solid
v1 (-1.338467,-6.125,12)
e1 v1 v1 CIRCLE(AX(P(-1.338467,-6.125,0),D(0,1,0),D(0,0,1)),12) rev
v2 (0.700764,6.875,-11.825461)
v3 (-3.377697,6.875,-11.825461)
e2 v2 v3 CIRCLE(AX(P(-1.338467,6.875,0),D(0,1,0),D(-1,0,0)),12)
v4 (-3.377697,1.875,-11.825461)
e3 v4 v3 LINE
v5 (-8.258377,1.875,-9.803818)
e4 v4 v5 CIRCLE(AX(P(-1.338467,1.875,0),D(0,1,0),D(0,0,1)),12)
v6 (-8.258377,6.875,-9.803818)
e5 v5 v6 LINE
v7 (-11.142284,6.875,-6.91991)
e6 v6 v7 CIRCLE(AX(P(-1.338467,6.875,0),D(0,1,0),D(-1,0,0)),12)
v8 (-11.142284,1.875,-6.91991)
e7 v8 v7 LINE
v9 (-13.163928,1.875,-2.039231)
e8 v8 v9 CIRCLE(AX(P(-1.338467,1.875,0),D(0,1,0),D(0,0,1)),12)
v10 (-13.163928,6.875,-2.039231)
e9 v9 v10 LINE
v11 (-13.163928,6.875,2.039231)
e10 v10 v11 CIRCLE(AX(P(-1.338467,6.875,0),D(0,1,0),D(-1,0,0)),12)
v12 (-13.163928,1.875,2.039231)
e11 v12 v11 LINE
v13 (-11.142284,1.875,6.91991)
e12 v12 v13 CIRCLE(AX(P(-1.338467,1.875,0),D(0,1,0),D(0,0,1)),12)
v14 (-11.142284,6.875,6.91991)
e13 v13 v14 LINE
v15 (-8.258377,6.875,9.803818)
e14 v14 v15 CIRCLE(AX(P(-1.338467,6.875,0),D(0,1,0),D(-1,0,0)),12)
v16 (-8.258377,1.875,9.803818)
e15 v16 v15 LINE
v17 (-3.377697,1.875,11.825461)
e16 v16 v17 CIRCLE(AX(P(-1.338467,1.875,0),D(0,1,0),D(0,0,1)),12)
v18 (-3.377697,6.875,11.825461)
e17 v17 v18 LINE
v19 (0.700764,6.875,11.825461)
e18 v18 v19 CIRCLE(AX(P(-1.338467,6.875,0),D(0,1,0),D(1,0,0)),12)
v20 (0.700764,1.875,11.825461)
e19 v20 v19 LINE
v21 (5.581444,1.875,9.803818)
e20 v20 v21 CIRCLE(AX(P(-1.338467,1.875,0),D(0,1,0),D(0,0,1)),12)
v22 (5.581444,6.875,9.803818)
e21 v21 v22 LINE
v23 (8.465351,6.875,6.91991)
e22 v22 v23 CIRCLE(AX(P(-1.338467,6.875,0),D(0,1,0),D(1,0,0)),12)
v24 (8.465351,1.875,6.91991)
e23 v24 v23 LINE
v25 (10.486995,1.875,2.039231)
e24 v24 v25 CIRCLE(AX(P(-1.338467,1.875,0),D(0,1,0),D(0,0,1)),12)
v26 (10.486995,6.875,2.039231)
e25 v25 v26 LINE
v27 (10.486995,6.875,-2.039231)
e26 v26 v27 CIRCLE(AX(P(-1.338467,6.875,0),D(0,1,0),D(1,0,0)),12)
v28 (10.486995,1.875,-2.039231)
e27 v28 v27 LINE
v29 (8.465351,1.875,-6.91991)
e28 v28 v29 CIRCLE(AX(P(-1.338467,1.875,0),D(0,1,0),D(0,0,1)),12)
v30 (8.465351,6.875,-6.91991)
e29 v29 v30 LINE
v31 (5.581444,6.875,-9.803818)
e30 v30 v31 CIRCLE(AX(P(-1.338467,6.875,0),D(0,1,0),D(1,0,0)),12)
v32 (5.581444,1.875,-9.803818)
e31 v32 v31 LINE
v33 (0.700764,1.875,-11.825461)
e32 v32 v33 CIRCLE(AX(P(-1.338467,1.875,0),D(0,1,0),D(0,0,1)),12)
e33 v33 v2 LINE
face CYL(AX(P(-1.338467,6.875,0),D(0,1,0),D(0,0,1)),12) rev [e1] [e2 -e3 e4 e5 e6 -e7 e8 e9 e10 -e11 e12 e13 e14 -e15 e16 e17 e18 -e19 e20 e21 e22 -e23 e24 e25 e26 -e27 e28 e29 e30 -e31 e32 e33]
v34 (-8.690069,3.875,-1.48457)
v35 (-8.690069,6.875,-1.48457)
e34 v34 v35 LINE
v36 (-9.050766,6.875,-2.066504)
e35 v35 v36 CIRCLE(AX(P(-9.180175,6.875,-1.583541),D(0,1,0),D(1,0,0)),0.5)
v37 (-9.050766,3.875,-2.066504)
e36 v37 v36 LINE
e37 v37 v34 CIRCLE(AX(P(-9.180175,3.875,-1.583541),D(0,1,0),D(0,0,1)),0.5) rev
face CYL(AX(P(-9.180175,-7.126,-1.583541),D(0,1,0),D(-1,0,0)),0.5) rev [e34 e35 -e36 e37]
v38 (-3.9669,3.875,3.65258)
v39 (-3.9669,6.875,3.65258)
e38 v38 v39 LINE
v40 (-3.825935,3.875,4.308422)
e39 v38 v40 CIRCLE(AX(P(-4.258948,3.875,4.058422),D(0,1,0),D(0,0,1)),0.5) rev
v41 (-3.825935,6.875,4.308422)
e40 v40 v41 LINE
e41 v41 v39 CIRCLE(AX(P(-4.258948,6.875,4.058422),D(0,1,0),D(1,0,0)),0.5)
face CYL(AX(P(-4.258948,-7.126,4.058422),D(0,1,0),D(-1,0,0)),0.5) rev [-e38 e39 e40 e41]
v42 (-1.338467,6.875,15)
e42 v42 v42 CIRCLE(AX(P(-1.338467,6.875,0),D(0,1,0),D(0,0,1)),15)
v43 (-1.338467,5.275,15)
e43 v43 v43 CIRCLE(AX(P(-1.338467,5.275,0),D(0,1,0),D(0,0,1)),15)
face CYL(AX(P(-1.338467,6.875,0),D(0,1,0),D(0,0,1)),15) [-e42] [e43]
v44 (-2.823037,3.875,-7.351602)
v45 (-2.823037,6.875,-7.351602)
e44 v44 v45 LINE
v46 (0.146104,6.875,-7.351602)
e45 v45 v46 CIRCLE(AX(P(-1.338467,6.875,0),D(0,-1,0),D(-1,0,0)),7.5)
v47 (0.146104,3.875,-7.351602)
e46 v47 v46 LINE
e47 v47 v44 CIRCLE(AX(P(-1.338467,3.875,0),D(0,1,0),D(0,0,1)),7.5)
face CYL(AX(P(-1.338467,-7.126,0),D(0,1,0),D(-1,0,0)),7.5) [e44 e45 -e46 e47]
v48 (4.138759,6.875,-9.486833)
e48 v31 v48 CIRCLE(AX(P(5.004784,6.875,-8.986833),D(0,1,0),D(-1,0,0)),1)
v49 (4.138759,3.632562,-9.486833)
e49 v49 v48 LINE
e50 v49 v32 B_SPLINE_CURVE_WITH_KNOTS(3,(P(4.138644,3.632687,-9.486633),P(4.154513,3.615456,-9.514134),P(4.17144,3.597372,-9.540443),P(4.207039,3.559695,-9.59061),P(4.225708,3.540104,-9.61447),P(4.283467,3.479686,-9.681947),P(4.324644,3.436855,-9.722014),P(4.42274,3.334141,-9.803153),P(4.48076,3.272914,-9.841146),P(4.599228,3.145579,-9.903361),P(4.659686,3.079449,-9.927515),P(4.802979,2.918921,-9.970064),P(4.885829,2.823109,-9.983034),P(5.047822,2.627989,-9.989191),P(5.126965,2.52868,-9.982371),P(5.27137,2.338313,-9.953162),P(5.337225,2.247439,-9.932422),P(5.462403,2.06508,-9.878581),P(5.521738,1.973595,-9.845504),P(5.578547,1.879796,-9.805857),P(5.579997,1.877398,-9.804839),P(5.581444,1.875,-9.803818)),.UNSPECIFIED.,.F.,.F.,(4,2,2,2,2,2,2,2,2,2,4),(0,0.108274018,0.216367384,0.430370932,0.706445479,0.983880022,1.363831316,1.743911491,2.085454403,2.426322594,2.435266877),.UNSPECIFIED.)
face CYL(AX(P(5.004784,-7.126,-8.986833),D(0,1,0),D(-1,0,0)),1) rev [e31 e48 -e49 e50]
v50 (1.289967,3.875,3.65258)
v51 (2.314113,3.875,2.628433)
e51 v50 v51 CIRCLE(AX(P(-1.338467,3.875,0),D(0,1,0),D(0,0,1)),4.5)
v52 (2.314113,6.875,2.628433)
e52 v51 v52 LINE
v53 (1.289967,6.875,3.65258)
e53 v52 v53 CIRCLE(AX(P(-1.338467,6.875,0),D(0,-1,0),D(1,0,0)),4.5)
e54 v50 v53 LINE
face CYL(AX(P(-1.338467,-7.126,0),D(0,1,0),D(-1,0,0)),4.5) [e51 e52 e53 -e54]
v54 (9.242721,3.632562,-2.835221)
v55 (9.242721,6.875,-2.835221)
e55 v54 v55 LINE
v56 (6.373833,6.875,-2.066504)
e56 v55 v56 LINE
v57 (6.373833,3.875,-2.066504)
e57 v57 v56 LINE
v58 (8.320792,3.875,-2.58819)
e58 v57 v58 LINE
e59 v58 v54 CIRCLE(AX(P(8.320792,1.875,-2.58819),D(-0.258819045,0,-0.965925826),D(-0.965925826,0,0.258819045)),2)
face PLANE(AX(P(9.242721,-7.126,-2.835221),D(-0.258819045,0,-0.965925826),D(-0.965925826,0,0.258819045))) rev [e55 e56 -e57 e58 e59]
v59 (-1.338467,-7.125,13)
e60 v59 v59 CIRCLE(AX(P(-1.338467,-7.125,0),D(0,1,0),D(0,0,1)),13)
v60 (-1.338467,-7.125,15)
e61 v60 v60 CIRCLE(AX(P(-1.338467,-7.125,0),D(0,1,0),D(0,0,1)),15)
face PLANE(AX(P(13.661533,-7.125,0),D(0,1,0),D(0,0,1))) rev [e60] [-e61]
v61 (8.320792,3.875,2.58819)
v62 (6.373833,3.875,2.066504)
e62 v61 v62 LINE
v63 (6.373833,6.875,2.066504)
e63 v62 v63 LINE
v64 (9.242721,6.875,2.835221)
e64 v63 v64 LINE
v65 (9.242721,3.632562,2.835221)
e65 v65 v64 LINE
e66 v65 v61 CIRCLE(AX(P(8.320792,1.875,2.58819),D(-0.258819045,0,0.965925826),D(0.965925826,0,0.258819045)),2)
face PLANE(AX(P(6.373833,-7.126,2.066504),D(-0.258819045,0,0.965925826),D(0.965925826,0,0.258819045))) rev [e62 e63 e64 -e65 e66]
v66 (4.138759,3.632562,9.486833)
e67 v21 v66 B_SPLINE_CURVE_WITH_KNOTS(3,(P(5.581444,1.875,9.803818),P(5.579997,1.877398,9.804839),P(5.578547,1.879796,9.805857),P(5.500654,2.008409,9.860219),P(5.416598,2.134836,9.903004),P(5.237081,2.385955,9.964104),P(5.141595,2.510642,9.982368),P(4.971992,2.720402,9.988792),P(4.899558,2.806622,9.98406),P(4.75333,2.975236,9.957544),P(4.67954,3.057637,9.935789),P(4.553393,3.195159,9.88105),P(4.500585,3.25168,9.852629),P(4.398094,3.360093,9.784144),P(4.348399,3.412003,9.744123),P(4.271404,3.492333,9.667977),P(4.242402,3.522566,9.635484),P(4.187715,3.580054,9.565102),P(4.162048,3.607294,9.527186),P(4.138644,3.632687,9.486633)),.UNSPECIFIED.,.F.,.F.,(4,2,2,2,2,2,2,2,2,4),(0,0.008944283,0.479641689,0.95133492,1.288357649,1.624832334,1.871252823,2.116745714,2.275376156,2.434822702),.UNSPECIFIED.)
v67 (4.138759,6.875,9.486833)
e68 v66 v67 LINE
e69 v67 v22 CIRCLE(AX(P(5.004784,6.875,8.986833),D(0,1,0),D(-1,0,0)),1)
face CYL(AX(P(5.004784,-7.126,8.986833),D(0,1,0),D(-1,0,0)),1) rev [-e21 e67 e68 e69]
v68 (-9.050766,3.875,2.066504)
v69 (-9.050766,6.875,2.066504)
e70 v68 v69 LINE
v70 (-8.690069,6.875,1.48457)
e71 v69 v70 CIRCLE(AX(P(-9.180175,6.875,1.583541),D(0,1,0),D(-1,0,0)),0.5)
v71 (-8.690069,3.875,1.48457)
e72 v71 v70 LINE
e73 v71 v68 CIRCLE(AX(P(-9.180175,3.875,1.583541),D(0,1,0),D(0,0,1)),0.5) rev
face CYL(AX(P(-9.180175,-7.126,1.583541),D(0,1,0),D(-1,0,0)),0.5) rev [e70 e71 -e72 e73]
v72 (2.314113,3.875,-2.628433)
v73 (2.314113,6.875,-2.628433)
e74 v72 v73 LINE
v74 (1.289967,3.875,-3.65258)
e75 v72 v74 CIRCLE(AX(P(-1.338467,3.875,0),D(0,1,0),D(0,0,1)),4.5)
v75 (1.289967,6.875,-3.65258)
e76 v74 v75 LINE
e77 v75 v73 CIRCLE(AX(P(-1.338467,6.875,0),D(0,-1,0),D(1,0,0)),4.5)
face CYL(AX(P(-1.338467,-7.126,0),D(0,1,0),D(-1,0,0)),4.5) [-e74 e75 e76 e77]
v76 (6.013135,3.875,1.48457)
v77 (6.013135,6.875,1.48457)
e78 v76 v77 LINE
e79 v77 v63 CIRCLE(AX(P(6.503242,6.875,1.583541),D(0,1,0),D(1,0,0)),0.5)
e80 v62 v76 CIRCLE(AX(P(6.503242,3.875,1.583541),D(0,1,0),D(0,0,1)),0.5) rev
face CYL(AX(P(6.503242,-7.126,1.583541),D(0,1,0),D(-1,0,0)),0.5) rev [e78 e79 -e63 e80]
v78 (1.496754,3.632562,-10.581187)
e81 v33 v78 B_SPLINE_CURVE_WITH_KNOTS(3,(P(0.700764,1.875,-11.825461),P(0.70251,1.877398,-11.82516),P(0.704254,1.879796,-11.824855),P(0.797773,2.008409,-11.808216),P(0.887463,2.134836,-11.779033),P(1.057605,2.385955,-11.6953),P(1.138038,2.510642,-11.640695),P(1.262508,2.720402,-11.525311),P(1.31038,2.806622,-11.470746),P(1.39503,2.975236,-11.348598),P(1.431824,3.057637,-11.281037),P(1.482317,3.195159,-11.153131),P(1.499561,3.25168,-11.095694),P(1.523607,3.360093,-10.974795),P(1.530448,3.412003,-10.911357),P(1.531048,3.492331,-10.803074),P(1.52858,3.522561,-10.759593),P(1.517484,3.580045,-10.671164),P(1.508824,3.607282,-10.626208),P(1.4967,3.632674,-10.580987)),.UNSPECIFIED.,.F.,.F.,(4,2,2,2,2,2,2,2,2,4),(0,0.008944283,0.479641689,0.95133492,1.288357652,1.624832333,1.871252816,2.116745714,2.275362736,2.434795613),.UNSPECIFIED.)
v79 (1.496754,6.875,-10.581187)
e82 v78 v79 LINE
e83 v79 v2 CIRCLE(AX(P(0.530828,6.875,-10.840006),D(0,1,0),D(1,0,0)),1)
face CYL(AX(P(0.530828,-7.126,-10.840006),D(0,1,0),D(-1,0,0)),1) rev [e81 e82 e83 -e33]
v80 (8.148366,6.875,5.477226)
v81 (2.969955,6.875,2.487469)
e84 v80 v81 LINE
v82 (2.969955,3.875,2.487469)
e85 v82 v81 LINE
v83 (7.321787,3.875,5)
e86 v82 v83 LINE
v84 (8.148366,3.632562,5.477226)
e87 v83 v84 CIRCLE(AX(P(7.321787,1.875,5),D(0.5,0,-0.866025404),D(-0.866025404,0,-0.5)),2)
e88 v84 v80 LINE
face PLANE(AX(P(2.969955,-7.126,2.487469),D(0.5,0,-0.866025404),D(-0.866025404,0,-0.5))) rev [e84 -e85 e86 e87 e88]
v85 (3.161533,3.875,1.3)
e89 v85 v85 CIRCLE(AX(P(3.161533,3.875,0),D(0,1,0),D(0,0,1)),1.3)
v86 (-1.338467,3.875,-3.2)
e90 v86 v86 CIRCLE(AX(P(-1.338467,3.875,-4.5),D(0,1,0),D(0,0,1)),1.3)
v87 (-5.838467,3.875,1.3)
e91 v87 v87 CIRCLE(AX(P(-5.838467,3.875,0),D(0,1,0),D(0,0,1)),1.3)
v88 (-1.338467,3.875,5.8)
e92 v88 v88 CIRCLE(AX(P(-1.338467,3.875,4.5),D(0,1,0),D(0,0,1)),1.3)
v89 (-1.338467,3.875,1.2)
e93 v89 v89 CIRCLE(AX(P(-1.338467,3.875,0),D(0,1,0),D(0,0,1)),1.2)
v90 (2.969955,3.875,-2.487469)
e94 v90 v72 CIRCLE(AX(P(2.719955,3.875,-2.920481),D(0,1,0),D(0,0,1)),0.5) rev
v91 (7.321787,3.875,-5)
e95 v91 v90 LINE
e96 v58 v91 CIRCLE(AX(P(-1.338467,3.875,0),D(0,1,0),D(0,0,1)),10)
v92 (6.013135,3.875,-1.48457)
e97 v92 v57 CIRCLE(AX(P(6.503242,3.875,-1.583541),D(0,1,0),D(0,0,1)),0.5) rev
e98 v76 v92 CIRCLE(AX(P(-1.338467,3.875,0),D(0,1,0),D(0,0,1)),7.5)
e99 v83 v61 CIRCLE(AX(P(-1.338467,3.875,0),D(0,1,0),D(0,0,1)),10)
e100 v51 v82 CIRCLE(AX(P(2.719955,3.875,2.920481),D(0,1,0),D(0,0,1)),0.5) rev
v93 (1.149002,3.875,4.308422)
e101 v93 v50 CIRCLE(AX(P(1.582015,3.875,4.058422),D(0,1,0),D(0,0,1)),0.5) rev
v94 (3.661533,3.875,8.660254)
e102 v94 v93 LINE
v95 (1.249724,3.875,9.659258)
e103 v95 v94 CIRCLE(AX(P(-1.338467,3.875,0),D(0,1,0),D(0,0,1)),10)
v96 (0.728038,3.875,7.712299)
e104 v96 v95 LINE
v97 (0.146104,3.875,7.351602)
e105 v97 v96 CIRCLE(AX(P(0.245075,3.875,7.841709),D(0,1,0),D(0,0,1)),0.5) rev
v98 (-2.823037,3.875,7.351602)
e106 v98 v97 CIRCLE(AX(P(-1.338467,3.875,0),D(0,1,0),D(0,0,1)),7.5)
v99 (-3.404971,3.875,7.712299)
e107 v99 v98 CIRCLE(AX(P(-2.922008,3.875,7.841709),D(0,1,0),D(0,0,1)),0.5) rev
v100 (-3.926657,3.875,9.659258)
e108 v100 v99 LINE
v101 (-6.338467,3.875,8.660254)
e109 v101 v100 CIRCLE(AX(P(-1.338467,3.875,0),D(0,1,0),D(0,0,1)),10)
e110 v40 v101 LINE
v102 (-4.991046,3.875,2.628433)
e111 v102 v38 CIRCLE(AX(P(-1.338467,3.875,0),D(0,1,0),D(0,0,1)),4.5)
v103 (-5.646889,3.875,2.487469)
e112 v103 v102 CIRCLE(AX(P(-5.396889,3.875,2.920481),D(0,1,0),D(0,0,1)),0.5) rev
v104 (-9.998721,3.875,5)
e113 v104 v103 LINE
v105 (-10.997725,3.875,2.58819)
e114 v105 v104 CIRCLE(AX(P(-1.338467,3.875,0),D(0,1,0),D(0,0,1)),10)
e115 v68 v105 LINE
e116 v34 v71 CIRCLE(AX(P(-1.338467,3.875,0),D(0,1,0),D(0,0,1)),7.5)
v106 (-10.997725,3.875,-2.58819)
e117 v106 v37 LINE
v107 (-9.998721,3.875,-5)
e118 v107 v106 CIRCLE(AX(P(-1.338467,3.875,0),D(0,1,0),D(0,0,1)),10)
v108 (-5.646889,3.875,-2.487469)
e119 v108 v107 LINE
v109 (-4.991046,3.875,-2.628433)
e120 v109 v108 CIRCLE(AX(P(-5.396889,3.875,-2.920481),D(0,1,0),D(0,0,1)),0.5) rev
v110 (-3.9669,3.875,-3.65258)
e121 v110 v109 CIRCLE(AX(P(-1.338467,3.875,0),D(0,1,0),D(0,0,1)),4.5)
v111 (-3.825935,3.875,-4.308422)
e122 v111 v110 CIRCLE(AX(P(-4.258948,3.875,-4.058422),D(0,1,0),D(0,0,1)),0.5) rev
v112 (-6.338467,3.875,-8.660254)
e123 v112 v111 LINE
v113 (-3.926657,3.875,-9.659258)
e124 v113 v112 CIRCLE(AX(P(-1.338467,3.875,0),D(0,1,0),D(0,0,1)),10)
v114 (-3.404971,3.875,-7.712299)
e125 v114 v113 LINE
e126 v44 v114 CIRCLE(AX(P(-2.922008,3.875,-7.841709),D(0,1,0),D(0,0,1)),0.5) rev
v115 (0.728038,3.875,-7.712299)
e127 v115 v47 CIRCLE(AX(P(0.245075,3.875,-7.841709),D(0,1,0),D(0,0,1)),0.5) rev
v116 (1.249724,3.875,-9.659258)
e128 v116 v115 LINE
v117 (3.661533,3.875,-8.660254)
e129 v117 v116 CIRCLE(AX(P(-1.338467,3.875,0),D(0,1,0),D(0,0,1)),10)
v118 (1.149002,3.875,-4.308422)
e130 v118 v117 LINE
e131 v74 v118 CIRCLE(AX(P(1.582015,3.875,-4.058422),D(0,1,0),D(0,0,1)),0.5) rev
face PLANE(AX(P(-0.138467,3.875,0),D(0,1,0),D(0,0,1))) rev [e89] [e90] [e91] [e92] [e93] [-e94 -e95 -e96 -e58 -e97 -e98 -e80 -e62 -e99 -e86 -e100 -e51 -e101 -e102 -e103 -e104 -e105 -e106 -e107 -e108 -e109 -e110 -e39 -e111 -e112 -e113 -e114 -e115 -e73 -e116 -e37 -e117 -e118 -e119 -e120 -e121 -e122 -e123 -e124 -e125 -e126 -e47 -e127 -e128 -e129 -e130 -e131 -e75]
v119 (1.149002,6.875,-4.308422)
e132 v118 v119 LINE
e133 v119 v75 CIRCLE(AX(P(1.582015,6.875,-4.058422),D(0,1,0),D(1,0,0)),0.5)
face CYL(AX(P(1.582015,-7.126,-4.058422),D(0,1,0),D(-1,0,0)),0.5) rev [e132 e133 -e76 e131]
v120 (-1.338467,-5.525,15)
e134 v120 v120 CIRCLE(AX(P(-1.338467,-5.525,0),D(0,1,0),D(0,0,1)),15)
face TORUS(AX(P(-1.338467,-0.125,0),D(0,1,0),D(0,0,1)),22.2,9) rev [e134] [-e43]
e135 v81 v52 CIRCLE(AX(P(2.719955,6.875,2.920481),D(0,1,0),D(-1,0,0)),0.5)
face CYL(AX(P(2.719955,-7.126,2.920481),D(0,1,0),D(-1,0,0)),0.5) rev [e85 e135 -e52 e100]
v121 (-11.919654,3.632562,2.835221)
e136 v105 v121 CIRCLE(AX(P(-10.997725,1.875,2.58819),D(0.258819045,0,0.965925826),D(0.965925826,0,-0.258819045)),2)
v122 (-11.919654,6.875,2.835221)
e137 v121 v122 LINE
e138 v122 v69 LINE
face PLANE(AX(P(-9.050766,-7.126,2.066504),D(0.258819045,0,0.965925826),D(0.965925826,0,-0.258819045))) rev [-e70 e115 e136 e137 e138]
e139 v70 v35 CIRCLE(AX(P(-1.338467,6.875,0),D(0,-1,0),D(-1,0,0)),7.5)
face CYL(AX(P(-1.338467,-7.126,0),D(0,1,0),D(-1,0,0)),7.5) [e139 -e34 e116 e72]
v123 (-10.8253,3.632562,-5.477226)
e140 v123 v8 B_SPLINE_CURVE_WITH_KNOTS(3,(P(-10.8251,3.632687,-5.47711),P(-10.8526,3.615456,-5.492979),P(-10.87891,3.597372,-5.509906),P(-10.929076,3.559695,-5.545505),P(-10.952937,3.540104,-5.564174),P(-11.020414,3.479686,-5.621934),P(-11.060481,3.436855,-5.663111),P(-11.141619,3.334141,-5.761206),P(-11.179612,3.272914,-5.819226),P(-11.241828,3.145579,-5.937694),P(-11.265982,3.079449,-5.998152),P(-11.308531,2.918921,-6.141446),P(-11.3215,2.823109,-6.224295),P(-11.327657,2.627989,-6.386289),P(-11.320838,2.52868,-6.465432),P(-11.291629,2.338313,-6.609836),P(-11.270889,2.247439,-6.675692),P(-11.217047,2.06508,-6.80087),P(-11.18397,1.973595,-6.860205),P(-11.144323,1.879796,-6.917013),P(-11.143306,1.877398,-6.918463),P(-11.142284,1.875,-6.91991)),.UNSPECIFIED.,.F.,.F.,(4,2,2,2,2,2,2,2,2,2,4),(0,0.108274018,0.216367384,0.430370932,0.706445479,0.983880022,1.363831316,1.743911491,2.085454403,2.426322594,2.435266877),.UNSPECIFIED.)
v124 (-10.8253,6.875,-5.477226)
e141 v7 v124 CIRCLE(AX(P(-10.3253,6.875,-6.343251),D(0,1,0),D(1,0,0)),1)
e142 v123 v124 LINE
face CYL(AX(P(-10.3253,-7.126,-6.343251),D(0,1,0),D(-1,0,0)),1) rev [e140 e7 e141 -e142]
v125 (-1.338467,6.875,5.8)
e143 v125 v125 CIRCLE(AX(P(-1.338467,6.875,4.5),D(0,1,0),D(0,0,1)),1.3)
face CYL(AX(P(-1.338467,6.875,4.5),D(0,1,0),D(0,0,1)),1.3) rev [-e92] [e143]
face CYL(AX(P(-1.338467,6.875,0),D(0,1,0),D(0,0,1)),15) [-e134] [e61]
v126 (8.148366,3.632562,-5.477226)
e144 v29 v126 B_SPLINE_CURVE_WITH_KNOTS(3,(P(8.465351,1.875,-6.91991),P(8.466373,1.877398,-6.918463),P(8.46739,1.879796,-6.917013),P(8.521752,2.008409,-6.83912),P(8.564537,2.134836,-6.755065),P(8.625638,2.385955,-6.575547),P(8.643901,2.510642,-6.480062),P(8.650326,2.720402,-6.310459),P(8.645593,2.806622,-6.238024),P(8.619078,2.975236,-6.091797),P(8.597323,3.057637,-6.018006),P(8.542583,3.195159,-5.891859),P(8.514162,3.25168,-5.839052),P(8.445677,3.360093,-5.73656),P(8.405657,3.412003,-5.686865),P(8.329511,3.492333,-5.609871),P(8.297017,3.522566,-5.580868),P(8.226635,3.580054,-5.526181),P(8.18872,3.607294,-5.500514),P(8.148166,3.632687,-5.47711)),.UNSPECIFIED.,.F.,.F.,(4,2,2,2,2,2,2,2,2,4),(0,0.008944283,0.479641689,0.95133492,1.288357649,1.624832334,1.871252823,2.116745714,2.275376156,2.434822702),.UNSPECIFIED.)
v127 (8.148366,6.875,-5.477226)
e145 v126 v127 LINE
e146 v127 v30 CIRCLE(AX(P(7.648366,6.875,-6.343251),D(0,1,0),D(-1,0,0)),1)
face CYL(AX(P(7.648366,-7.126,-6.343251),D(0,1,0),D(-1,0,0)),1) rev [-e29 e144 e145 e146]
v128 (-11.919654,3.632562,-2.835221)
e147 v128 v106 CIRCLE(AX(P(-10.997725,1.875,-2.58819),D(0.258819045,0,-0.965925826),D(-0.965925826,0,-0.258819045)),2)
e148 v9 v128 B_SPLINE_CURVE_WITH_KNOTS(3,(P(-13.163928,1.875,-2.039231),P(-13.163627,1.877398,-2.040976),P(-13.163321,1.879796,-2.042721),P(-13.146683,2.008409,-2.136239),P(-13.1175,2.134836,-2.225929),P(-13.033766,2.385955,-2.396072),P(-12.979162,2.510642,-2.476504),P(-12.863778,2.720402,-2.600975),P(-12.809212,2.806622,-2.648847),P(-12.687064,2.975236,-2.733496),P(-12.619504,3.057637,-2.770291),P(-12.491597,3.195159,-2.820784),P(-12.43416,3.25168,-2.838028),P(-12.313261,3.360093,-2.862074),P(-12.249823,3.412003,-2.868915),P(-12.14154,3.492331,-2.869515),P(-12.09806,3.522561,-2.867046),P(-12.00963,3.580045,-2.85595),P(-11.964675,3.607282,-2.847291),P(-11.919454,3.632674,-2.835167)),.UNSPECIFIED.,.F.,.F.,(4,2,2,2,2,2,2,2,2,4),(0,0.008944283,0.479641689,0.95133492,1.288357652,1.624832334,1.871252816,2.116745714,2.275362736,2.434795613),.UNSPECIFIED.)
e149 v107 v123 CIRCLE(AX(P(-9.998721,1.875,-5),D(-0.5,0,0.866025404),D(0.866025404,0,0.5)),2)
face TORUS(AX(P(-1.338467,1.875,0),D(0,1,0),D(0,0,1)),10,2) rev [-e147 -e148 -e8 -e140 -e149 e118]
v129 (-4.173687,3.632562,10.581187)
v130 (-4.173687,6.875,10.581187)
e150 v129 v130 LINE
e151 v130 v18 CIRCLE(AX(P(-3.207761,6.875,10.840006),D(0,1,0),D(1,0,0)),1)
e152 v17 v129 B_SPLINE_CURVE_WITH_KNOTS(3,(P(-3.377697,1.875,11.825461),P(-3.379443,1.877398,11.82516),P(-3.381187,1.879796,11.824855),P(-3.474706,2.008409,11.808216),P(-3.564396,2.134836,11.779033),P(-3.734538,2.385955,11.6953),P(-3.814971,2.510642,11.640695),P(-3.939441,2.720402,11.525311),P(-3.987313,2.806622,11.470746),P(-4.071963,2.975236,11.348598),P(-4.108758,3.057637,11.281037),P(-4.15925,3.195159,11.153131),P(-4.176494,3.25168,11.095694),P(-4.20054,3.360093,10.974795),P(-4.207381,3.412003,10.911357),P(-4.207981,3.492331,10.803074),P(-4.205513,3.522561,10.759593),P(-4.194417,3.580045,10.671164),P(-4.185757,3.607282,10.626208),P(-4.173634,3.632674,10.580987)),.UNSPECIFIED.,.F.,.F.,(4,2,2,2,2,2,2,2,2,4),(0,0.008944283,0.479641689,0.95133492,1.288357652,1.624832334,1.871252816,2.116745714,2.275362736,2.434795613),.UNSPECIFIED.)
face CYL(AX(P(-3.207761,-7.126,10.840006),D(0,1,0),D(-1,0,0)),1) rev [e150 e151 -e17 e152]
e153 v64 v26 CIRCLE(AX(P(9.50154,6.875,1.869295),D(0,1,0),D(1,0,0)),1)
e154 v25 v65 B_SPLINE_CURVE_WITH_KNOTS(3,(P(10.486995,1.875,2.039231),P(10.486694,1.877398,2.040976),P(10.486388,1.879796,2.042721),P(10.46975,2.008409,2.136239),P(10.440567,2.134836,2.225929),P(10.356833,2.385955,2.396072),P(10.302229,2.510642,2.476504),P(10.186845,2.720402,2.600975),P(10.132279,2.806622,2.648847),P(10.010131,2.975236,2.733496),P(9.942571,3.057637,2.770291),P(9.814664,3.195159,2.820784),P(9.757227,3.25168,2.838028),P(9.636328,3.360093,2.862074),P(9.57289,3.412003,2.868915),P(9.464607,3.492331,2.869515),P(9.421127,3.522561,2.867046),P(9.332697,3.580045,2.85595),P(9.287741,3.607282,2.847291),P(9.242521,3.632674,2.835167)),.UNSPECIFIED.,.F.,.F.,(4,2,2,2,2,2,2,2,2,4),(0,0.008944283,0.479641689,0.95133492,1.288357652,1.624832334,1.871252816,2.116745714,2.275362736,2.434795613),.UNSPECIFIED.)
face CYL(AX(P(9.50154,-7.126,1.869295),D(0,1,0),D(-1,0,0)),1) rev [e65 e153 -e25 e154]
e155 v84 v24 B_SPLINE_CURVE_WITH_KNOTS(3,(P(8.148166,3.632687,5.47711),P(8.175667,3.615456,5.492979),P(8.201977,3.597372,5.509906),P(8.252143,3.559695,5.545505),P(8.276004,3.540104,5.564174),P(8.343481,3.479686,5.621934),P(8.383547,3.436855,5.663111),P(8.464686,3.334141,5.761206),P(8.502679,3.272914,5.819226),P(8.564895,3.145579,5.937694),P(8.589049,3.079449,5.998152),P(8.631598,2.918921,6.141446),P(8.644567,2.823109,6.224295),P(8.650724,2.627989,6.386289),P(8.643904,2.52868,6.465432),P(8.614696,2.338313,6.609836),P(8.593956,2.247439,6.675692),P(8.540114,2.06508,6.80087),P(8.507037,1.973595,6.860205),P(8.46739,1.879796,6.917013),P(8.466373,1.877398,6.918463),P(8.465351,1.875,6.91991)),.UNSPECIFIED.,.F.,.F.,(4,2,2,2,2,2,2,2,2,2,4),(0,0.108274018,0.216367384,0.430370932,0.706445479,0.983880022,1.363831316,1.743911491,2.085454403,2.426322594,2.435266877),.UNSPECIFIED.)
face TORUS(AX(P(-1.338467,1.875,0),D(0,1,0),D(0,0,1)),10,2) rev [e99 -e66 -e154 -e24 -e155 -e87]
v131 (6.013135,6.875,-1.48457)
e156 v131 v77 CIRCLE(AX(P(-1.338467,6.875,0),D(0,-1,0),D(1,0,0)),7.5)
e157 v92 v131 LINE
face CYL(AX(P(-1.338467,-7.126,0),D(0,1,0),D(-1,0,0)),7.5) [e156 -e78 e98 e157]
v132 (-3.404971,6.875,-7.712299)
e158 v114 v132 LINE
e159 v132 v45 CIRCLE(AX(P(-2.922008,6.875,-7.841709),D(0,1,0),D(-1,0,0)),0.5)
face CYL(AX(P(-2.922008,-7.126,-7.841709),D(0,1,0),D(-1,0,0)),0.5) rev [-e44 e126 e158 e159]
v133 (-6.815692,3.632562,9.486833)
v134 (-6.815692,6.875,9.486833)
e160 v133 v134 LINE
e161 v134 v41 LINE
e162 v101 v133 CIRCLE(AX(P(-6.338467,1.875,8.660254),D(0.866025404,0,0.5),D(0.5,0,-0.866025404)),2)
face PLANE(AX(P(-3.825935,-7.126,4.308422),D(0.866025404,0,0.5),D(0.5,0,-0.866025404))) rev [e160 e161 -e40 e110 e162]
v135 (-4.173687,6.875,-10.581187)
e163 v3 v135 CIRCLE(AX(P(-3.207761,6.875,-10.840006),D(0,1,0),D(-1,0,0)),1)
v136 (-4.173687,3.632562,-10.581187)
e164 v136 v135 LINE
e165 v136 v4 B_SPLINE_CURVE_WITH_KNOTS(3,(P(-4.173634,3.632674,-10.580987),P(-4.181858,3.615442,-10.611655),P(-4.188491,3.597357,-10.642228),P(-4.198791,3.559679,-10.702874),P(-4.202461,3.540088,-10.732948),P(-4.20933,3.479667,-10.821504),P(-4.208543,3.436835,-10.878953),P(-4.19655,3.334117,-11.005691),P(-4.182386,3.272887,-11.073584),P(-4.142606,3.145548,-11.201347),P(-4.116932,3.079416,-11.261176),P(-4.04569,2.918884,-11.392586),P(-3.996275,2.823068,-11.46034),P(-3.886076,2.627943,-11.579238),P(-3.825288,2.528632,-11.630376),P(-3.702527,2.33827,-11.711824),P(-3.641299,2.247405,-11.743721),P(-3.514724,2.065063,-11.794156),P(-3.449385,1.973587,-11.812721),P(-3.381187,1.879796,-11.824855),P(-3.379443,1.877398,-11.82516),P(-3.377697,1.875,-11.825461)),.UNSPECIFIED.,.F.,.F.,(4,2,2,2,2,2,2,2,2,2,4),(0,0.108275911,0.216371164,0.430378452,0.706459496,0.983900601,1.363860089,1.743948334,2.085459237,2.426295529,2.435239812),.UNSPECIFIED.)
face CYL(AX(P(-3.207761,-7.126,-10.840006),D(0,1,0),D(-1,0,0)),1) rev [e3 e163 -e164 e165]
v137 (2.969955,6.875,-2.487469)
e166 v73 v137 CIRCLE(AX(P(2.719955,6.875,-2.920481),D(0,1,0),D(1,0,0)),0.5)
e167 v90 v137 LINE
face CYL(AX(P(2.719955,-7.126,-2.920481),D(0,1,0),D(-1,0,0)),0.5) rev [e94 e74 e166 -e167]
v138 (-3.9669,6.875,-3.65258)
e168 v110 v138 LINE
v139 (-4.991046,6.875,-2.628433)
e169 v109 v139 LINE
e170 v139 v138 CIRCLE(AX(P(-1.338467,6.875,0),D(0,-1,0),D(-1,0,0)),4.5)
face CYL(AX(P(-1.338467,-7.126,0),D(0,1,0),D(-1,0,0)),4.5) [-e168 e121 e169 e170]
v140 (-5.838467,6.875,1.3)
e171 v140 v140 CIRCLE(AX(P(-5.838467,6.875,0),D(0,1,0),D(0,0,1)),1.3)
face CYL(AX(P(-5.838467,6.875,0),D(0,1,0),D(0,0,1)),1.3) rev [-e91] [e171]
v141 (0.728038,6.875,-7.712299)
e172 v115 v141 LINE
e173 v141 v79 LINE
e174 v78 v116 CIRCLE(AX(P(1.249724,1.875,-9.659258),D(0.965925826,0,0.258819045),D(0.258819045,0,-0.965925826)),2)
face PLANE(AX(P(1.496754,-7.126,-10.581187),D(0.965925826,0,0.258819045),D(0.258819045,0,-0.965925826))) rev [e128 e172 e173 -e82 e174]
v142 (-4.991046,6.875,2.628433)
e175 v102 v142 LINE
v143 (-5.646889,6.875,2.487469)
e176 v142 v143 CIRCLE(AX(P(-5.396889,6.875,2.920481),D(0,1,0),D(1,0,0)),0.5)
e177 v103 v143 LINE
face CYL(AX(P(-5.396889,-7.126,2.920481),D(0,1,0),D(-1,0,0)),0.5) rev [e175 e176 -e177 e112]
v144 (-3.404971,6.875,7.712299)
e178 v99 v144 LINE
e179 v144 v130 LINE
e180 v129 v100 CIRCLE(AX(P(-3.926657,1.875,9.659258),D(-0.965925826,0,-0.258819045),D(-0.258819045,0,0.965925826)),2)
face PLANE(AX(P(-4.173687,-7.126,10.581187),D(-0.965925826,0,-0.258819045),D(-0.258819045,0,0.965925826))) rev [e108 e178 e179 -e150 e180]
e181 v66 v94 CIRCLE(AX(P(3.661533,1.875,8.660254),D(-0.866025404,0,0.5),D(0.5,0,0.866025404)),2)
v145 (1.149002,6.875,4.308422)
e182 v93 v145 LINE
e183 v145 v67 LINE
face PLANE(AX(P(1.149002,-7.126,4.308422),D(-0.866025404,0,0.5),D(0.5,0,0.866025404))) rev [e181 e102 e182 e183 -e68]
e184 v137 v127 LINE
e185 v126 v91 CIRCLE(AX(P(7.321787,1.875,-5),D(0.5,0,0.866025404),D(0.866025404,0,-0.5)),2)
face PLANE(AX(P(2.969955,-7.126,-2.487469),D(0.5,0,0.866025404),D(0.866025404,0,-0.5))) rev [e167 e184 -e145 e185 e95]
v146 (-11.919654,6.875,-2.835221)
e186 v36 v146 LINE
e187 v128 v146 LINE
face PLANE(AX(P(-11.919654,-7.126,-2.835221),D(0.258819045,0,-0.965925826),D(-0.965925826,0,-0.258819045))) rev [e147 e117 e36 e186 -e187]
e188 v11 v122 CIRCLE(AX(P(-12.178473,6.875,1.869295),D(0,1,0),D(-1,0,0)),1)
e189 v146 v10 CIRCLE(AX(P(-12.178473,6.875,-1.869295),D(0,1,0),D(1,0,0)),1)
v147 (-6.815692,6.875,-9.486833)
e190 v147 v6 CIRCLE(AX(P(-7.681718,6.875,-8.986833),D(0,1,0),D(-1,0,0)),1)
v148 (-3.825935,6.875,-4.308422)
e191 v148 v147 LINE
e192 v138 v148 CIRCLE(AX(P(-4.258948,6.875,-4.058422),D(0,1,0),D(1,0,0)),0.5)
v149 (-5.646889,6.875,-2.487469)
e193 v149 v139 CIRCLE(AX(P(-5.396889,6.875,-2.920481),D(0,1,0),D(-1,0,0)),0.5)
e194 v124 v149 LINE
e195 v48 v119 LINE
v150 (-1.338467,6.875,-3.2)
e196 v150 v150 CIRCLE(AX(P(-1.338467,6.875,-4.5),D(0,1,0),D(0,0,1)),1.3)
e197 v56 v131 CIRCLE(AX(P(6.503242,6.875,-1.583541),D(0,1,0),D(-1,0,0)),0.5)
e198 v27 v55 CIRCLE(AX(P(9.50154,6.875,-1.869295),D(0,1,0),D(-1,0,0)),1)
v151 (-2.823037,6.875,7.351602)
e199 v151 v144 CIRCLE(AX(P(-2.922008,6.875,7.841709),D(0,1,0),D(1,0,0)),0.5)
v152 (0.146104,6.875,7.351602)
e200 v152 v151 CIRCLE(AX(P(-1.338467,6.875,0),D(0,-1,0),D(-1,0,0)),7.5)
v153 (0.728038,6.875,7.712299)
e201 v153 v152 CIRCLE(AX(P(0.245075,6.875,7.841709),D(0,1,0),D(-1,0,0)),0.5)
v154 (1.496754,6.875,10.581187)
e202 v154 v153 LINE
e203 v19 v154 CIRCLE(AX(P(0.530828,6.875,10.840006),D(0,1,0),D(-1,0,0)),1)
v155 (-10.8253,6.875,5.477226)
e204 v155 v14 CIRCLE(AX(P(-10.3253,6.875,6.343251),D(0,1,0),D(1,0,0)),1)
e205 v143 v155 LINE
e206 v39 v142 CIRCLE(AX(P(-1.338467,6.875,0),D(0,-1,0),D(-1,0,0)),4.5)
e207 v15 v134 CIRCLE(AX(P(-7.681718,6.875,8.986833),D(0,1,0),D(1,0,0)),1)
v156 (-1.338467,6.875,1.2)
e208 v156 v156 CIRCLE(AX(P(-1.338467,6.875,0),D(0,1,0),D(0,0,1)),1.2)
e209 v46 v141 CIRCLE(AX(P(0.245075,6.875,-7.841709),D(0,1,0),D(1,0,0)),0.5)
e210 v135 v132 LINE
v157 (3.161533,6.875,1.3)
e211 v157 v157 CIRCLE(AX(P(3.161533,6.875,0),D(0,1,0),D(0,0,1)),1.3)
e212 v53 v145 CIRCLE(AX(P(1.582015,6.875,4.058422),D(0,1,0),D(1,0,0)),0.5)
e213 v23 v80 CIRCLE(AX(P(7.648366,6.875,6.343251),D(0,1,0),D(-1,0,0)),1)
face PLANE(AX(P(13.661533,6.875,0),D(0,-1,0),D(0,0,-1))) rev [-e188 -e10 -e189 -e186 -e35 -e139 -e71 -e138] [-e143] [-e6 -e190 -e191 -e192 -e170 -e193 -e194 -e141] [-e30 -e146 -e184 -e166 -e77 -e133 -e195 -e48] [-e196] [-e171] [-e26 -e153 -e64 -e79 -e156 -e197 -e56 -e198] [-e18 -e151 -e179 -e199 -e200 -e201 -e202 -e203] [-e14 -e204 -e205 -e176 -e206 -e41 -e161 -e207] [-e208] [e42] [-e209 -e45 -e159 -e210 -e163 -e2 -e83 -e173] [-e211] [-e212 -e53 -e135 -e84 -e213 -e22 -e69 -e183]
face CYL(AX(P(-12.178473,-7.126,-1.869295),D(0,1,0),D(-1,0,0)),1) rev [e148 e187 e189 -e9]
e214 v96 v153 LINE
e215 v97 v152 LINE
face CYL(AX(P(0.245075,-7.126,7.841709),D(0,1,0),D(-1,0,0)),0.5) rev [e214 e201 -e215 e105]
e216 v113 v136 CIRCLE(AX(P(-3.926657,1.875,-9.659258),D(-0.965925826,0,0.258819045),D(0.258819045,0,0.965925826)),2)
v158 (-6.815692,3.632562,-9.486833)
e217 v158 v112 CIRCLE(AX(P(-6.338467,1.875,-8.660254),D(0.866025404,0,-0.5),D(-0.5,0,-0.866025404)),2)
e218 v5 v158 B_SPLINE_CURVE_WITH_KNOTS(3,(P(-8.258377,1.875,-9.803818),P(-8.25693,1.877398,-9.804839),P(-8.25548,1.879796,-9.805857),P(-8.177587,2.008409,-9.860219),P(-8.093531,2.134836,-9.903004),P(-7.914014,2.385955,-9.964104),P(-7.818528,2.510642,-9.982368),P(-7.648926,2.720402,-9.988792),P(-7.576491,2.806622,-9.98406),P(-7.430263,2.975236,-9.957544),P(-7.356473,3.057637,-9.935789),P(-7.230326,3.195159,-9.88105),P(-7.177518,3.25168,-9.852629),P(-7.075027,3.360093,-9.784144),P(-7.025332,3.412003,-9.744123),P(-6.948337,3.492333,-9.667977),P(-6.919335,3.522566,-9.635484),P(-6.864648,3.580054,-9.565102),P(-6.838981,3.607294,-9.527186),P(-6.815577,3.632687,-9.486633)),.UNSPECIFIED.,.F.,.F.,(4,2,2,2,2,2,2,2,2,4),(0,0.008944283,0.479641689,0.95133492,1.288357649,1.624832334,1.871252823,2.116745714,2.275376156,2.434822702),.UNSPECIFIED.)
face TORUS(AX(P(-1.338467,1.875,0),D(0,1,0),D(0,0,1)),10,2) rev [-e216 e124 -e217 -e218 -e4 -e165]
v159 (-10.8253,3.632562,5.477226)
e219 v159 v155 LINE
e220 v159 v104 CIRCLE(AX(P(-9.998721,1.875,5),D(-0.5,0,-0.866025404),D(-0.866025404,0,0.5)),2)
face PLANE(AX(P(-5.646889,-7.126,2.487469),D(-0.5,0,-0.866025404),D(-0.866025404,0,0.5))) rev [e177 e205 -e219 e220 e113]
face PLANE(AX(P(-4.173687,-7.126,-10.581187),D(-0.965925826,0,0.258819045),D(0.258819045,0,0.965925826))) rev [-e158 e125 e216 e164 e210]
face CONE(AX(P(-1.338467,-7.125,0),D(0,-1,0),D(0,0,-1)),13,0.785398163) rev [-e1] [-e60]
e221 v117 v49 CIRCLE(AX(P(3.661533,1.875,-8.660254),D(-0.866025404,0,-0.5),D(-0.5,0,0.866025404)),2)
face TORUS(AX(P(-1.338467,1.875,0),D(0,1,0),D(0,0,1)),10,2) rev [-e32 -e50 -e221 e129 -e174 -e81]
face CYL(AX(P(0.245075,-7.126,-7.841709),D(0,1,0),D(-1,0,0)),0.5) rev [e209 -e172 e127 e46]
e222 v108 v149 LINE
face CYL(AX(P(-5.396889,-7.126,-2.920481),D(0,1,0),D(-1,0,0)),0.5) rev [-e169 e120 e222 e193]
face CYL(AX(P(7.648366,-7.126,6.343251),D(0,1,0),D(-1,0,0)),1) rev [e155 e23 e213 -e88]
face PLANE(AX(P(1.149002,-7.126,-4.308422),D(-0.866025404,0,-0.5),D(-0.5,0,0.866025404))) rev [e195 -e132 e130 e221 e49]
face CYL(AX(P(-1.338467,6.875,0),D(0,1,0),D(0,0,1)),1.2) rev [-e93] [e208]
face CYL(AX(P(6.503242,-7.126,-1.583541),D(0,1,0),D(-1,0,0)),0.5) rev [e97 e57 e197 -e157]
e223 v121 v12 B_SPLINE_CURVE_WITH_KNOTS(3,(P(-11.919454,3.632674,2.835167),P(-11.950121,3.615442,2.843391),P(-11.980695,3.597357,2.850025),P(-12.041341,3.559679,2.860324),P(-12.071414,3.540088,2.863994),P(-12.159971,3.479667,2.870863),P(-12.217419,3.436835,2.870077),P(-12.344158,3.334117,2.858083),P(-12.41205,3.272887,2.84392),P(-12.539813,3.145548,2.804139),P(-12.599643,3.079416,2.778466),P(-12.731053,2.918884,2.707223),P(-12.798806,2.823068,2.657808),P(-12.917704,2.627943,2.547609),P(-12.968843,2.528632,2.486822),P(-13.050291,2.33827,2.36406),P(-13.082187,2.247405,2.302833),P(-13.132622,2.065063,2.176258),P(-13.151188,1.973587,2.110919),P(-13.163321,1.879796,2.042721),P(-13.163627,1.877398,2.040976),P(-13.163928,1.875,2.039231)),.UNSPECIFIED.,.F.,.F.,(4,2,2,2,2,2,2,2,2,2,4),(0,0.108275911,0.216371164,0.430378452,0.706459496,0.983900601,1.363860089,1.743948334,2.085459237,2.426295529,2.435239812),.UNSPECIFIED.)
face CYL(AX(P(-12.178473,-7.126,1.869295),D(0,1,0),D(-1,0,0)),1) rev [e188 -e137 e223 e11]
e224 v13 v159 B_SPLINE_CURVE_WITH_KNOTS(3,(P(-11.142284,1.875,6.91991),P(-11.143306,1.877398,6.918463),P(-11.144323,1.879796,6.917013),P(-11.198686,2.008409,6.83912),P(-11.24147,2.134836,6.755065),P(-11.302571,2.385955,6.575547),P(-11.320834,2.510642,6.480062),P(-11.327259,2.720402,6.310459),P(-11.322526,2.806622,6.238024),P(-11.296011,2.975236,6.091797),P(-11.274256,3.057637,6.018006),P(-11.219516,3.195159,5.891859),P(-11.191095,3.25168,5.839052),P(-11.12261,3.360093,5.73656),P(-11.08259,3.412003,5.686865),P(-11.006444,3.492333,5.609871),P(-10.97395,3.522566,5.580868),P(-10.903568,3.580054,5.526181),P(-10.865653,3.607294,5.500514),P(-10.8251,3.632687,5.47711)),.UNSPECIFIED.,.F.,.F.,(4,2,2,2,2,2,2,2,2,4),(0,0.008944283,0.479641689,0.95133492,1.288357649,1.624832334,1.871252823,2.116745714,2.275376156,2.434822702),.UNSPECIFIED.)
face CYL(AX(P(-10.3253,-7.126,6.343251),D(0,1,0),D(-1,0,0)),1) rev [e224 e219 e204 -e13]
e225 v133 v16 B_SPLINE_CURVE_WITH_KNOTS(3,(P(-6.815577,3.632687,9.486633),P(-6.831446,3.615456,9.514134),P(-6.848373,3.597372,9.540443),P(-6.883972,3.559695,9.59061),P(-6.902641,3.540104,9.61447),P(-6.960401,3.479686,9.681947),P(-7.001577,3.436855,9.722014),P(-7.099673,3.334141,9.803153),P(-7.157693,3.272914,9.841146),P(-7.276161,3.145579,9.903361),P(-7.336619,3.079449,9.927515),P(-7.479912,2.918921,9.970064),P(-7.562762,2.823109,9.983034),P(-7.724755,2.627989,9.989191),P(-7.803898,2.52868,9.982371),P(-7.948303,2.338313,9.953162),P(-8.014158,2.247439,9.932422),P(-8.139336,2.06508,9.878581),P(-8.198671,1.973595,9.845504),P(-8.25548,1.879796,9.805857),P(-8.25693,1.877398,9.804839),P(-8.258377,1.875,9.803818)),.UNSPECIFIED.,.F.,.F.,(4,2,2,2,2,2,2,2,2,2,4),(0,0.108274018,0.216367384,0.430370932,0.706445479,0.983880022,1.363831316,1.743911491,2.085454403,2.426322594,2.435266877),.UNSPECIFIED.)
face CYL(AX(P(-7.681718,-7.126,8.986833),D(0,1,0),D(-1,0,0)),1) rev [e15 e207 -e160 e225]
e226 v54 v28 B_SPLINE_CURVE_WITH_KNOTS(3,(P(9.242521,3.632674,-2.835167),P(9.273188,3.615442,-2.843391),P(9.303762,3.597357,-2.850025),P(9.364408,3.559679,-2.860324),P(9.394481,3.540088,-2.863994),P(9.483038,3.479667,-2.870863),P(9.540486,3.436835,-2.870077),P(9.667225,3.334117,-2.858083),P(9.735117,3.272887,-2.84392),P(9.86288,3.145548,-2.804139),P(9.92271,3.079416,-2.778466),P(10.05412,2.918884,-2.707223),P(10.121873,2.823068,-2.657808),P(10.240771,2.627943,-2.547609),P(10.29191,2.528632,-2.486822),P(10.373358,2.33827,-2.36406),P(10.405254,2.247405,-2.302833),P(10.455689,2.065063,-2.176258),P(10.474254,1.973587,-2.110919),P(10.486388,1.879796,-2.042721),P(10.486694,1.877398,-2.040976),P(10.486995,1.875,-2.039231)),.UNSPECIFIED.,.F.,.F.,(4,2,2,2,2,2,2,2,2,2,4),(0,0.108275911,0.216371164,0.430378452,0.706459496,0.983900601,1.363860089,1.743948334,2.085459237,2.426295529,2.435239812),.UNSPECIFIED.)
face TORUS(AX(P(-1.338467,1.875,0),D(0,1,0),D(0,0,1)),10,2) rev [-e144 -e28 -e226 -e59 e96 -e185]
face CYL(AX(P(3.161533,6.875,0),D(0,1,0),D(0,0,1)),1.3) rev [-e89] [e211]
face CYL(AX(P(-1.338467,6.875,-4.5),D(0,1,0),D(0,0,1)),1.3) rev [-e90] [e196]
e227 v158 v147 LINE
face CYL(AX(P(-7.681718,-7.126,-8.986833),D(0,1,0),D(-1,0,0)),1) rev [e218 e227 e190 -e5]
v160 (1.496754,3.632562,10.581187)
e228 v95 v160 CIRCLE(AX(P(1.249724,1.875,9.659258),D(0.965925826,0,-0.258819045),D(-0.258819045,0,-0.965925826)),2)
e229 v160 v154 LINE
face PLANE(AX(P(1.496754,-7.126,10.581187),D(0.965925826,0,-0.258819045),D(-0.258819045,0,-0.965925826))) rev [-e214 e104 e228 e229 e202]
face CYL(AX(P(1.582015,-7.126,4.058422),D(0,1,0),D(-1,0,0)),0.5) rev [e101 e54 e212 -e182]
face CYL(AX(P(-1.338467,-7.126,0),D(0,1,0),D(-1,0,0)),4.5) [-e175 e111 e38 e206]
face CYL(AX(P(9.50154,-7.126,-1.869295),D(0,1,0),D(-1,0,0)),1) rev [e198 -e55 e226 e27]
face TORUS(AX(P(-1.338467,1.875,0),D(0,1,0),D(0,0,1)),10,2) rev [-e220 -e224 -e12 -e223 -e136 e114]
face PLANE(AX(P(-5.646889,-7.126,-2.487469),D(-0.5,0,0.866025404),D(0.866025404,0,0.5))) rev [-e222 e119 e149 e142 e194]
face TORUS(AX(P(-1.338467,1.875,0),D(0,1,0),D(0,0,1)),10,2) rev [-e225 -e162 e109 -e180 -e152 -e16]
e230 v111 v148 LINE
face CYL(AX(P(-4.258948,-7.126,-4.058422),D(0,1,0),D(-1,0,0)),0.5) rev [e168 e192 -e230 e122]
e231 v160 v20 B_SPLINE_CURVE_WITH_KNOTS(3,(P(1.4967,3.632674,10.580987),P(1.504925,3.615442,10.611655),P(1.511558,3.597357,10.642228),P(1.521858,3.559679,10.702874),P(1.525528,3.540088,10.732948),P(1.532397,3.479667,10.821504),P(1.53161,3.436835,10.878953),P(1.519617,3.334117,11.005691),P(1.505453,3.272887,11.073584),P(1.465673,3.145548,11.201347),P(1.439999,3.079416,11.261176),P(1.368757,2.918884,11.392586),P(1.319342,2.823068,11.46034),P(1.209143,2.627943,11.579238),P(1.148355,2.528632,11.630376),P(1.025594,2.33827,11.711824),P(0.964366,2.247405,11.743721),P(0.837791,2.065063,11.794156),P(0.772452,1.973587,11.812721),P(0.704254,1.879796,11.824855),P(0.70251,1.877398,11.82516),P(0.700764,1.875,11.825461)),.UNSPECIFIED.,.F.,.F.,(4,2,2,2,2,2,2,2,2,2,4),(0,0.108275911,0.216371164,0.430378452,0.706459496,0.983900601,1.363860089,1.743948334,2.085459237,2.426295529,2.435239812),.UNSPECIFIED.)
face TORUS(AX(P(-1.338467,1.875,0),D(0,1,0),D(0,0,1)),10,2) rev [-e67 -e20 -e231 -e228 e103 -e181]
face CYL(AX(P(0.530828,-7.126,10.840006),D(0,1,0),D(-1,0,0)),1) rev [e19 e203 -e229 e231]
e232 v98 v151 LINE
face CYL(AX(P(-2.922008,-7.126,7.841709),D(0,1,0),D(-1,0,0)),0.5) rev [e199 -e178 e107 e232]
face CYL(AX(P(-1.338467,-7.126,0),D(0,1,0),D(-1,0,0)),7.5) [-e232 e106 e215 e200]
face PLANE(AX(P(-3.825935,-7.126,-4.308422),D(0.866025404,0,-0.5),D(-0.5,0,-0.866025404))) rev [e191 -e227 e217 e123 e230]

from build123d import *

# Parameters (mm, degrees)
M2_CLEARANCE_HOLE1_D = 2.6
CUT_EXTRUDE1_START   = -5.0000001
CUT_EXTRUDE1_DEPTH   = 5.0000001
CHAMFER1_SIZE        = 1


# Read off the part's stored shape, not the designer's step: Cut-Extrude1
with BuildPart() as part:
    # Sketch1 → Revolve1 (revolve)
    with BuildSketch(Plane.XY, mode=Mode.PRIVATE) as revolve1_sk:
        with BuildLine():
            Line((-0.1384665388769202, 3.8749999999999973), (8.66153346112308, 3.8749999999999982))
            ThreePointArc((8.66153346112308, 3.8749999999999982), (10.075747023496175, 3.289213562373093), (10.661533461123081, 1.874999999999998))
            Line((10.661533461123081, 1.874999999999998), (10.661533461123081, -7.125000000000003))
            Line((10.661533461123081, -7.125000000000003), (13.66153346112308, -7.125000000000003))
            Line((13.66153346112308, -7.125000000000003), (13.661533461123074, -5.524999999999995))
            ThreePointArc((13.661533461123074, -5.524999999999995), (12.323383778668454, -2.9710498941515384), (11.86153346112308, -0.12500000000000358))
            ThreePointArc((11.86153346112308, -0.12500000000000358), (12.323383778668454, 2.721049894151534), (13.661533461123074, 5.274999999999989))
            Line((13.661533461123074, 5.274999999999989), (13.66153346112308, 6.874999999999997))
            Line((13.66153346112308, 6.874999999999997), (-0.1384665388769206, 6.874999999999996))
            Line((-0.1384665388769206, 6.874999999999996), (-0.1384665388769202, 3.8749999999999973))
        make_face()
    revolve(revolve1_sk.sketch.rotate(Axis((-1.3384665388769221, 6.874999999999996, 0), (0, -1, 0)), 90), axis=Axis((-1.3384665388769221, 6.874999999999996, 0), (0, -1, 0)))

    # M2 Clearance Hole1 (through all)
    with Locations(Plane(origin=(0, 6.8749999999999964, 0), x_dir=(1, 3e-17, 0), z_dir=(-3e-17, 1, 0))):
        with Locations((-5.838466539, 0), (-1.338466539, 4.5), (3.161533461, 0), (-1.338466539, -4.5)):
            Hole(M2_CLEARANCE_HOLE1_D / 2)

    # Cut-Extrude1 outline → Cut-Extrude1 (cut)
    with BuildSketch(Plane(origin=(0, 6.8749999999999964, 0), x_dir=(1, 3e-17, 0), z_dir=(-3e-17, 1, 0)).offset(CUT_EXTRUDE1_START)):
        with BuildLine():
            ThreePointArc((10.486994905, -2.039230647), (10.661533461, 0), (10.486994905, 2.039230647))
            ThreePointArc((10.486994905, 2.039230647), (10.040427521, 2.711672352), (9.24272074, 2.835220586))
            Line((9.24272074, 2.835220586), (6.373832713, 2.066504356))
            ThreePointArc((6.373832713, 2.066504356), (6.078257545, 1.846957489), (6.013135437, 1.484570103))
            ThreePointArc((6.013135437, 1.484570103), (6.161533461, 0), (6.013135437, -1.484570103))
            ThreePointArc((6.013135437, -1.484570103), (6.078257545, -1.846957489), (6.373832713, -2.066504356))
            Line((6.373832713, -2.066504356), (9.24272074, -2.835220586))
            ThreePointArc((9.24272074, -2.835220586), (10.040427521, -2.711672352), (10.486994905, -2.039230647))
        make_face()
        with BuildLine():
            ThreePointArc((8.148366442, 5.477225575), (8.625068522, 6.128651244), (8.465351258, 6.919910159))
            ThreePointArc((8.465351258, 6.919910159), (7.146814835, 8.485281374), (5.58144362, 9.803817797))
            ThreePointArc((5.58144362, 9.803817797), (4.790184705, 9.963535061), (4.138759036, 9.486832981))
            Line((4.138759036, 9.486832981), (1.149002054, 4.308421985))
            ThreePointArc((1.149002054, 4.308421985), (1.093178843, 3.953353196), (1.289966626, 3.652579786))
            ThreePointArc((1.289966626, 3.652579786), (1.843513976, 3.181980515), (2.314113248, 2.628433165))
            ThreePointArc((2.314113248, 2.628433165), (2.614886658, 2.431645382), (2.969955446, 2.487468593))
            Line((2.969955446, 2.487468593), (8.148366442, 5.477225575))
        make_face()
        with BuildLine():
            ThreePointArc((5.58144362, -9.803817797), (7.146814835, -8.485281374), (8.465351258, -6.919910159))
            ThreePointArc((8.465351258, -6.919910159), (8.625068522, -6.128651244), (8.148366442, -5.477225575))
            Line((8.148366442, -5.477225575), (2.969955446, -2.487468593))
            ThreePointArc((2.969955446, -2.487468593), (2.614886658, -2.431645382), (2.314113248, -2.628433165))
            ThreePointArc((2.314113248, -2.628433165), (1.843513976, -3.181980515), (1.289966626, -3.652579786))
            ThreePointArc((1.289966626, -3.652579786), (1.093178843, -3.953353196), (1.149002054, -4.308421985))
            Line((1.149002054, -4.308421985), (4.138759036, -9.486832981))
            ThreePointArc((4.138759036, -9.486832981), (4.790184705, -9.963535061), (5.58144362, -9.803817797))
        make_face()
        with BuildLine():
            ThreePointArc((1.496754047, 10.581187279), (1.373205813, 11.37889406), (0.700764108, 11.825461444))
            ThreePointArc((0.700764108, 11.825461444), (-1.338466539, 12), (-3.377697186, 11.825461444))
            ThreePointArc((-3.377697186, 11.825461444), (-4.050138891, 11.37889406), (-4.173687125, 10.581187279))
            Line((-4.173687125, 10.581187279), (-3.404970895, 7.712299252))
            ThreePointArc((-3.404970895, 7.712299252), (-3.185424028, 7.416724084), (-2.823036642, 7.351601976))
            ThreePointArc((-2.823036642, 7.351601976), (-1.338466539, 7.5), (0.146103564, 7.351601976))
            ThreePointArc((0.146103564, 7.351601976), (0.50849095, 7.416724084), (0.728037817, 7.712299252))
            Line((0.728037817, 7.712299252), (1.496754047, 10.581187279))
        make_face()
        with BuildLine():
            ThreePointArc((-3.377697186, -11.825461444), (-1.338466539, -12), (0.700764108, -11.825461444))
            ThreePointArc((0.700764108, -11.825461444), (1.373205813, -11.37889406), (1.496754047, -10.581187279))
            Line((1.496754047, -10.581187279), (0.728037817, -7.712299252))
            ThreePointArc((0.728037817, -7.712299252), (0.50849095, -7.416724084), (0.146103564, -7.351601976))
            ThreePointArc((0.146103564, -7.351601976), (-1.338466539, -7.5), (-2.823036642, -7.351601976))
            ThreePointArc((-2.823036642, -7.351601976), (-3.185424028, -7.416724084), (-3.404970895, -7.712299252))
            Line((-3.404970895, -7.712299252), (-4.173687125, -10.581187279))
            ThreePointArc((-4.173687125, -10.581187279), (-4.050138891, -11.37889406), (-3.377697186, -11.825461444))
        make_face()
        with BuildLine():
            ThreePointArc((-6.815692114, 9.486832981), (-7.467117783, 9.963535061), (-8.258376698, 9.803817797))
            ThreePointArc((-8.258376698, 9.803817797), (-9.823747913, 8.485281374), (-11.142284336, 6.919910159))
            ThreePointArc((-11.142284336, 6.919910159), (-11.3020016, 6.128651244), (-10.825299519, 5.477225575))
            Line((-10.825299519, 5.477225575), (-5.646888524, 2.487468593))
            ThreePointArc((-5.646888524, 2.487468593), (-5.291819735, 2.431645382), (-4.991046325, 2.628433165))
            ThreePointArc((-4.991046325, 2.628433165), (-4.520447054, 3.181980515), (-3.966899704, 3.652579786))
            ThreePointArc((-3.966899704, 3.652579786), (-3.770111921, 3.953353196), (-3.825935132, 4.308421985))
            Line((-3.825935132, 4.308421985), (-6.815692114, 9.486832981))
        make_face()
        with BuildLine():
            ThreePointArc((-11.142284336, -6.919910159), (-9.823747913, -8.485281374), (-8.258376698, -9.803817797))
            ThreePointArc((-8.258376698, -9.803817797), (-7.467117783, -9.963535061), (-6.815692114, -9.486832981))
            Line((-6.815692114, -9.486832981), (-3.825935132, -4.308421985))
            ThreePointArc((-3.825935132, -4.308421985), (-3.770111921, -3.953353196), (-3.966899704, -3.652579786))
            ThreePointArc((-3.966899704, -3.652579786), (-4.520447054, -3.181980515), (-4.991046325, -2.628433165))
            ThreePointArc((-4.991046325, -2.628433165), (-5.291819735, -2.431645382), (-5.646888524, -2.487468593))
            Line((-5.646888524, -2.487468593), (-10.825299519, -5.477225575))
            ThreePointArc((-10.825299519, -5.477225575), (-11.3020016, -6.128651244), (-11.142284336, -6.919910159))
        make_face()
        with BuildLine():
            ThreePointArc((-11.919653818, 2.835220586), (-12.717360599, 2.711672352), (-13.163927983, 2.039230647))
            ThreePointArc((-13.163927983, 2.039230647), (-13.338466539, 0), (-13.163927983, -2.039230647))
            ThreePointArc((-13.163927983, -2.039230647), (-12.717360599, -2.711672352), (-11.919653818, -2.835220586))
            Line((-11.919653818, -2.835220586), (-9.05076579, -2.066504356))
            ThreePointArc((-9.05076579, -2.066504356), (-8.755190623, -1.846957489), (-8.690068515, -1.484570103))
            ThreePointArc((-8.690068515, -1.484570103), (-8.838466539, 0), (-8.690068515, 1.484570103))
            ThreePointArc((-8.690068515, 1.484570103), (-8.755190623, 1.846957489), (-9.05076579, 2.066504356))
            Line((-9.05076579, 2.066504356), (-11.919653818, 2.835220586))
        make_face()
    extrude(amount=CUT_EXTRUDE1_DEPTH, mode=Mode.SUBTRACT)

    # Chamfer1
    chamfer1_edges = [part.edges().sort_by_distance(p)[0] for p in [
        (-1.3384665388769197, -7.125000000000003, -12.000000000000004),
    ]]
    chamfer(chamfer1_edges, length=CHAMFER1_SIZE)


solid = part.part
